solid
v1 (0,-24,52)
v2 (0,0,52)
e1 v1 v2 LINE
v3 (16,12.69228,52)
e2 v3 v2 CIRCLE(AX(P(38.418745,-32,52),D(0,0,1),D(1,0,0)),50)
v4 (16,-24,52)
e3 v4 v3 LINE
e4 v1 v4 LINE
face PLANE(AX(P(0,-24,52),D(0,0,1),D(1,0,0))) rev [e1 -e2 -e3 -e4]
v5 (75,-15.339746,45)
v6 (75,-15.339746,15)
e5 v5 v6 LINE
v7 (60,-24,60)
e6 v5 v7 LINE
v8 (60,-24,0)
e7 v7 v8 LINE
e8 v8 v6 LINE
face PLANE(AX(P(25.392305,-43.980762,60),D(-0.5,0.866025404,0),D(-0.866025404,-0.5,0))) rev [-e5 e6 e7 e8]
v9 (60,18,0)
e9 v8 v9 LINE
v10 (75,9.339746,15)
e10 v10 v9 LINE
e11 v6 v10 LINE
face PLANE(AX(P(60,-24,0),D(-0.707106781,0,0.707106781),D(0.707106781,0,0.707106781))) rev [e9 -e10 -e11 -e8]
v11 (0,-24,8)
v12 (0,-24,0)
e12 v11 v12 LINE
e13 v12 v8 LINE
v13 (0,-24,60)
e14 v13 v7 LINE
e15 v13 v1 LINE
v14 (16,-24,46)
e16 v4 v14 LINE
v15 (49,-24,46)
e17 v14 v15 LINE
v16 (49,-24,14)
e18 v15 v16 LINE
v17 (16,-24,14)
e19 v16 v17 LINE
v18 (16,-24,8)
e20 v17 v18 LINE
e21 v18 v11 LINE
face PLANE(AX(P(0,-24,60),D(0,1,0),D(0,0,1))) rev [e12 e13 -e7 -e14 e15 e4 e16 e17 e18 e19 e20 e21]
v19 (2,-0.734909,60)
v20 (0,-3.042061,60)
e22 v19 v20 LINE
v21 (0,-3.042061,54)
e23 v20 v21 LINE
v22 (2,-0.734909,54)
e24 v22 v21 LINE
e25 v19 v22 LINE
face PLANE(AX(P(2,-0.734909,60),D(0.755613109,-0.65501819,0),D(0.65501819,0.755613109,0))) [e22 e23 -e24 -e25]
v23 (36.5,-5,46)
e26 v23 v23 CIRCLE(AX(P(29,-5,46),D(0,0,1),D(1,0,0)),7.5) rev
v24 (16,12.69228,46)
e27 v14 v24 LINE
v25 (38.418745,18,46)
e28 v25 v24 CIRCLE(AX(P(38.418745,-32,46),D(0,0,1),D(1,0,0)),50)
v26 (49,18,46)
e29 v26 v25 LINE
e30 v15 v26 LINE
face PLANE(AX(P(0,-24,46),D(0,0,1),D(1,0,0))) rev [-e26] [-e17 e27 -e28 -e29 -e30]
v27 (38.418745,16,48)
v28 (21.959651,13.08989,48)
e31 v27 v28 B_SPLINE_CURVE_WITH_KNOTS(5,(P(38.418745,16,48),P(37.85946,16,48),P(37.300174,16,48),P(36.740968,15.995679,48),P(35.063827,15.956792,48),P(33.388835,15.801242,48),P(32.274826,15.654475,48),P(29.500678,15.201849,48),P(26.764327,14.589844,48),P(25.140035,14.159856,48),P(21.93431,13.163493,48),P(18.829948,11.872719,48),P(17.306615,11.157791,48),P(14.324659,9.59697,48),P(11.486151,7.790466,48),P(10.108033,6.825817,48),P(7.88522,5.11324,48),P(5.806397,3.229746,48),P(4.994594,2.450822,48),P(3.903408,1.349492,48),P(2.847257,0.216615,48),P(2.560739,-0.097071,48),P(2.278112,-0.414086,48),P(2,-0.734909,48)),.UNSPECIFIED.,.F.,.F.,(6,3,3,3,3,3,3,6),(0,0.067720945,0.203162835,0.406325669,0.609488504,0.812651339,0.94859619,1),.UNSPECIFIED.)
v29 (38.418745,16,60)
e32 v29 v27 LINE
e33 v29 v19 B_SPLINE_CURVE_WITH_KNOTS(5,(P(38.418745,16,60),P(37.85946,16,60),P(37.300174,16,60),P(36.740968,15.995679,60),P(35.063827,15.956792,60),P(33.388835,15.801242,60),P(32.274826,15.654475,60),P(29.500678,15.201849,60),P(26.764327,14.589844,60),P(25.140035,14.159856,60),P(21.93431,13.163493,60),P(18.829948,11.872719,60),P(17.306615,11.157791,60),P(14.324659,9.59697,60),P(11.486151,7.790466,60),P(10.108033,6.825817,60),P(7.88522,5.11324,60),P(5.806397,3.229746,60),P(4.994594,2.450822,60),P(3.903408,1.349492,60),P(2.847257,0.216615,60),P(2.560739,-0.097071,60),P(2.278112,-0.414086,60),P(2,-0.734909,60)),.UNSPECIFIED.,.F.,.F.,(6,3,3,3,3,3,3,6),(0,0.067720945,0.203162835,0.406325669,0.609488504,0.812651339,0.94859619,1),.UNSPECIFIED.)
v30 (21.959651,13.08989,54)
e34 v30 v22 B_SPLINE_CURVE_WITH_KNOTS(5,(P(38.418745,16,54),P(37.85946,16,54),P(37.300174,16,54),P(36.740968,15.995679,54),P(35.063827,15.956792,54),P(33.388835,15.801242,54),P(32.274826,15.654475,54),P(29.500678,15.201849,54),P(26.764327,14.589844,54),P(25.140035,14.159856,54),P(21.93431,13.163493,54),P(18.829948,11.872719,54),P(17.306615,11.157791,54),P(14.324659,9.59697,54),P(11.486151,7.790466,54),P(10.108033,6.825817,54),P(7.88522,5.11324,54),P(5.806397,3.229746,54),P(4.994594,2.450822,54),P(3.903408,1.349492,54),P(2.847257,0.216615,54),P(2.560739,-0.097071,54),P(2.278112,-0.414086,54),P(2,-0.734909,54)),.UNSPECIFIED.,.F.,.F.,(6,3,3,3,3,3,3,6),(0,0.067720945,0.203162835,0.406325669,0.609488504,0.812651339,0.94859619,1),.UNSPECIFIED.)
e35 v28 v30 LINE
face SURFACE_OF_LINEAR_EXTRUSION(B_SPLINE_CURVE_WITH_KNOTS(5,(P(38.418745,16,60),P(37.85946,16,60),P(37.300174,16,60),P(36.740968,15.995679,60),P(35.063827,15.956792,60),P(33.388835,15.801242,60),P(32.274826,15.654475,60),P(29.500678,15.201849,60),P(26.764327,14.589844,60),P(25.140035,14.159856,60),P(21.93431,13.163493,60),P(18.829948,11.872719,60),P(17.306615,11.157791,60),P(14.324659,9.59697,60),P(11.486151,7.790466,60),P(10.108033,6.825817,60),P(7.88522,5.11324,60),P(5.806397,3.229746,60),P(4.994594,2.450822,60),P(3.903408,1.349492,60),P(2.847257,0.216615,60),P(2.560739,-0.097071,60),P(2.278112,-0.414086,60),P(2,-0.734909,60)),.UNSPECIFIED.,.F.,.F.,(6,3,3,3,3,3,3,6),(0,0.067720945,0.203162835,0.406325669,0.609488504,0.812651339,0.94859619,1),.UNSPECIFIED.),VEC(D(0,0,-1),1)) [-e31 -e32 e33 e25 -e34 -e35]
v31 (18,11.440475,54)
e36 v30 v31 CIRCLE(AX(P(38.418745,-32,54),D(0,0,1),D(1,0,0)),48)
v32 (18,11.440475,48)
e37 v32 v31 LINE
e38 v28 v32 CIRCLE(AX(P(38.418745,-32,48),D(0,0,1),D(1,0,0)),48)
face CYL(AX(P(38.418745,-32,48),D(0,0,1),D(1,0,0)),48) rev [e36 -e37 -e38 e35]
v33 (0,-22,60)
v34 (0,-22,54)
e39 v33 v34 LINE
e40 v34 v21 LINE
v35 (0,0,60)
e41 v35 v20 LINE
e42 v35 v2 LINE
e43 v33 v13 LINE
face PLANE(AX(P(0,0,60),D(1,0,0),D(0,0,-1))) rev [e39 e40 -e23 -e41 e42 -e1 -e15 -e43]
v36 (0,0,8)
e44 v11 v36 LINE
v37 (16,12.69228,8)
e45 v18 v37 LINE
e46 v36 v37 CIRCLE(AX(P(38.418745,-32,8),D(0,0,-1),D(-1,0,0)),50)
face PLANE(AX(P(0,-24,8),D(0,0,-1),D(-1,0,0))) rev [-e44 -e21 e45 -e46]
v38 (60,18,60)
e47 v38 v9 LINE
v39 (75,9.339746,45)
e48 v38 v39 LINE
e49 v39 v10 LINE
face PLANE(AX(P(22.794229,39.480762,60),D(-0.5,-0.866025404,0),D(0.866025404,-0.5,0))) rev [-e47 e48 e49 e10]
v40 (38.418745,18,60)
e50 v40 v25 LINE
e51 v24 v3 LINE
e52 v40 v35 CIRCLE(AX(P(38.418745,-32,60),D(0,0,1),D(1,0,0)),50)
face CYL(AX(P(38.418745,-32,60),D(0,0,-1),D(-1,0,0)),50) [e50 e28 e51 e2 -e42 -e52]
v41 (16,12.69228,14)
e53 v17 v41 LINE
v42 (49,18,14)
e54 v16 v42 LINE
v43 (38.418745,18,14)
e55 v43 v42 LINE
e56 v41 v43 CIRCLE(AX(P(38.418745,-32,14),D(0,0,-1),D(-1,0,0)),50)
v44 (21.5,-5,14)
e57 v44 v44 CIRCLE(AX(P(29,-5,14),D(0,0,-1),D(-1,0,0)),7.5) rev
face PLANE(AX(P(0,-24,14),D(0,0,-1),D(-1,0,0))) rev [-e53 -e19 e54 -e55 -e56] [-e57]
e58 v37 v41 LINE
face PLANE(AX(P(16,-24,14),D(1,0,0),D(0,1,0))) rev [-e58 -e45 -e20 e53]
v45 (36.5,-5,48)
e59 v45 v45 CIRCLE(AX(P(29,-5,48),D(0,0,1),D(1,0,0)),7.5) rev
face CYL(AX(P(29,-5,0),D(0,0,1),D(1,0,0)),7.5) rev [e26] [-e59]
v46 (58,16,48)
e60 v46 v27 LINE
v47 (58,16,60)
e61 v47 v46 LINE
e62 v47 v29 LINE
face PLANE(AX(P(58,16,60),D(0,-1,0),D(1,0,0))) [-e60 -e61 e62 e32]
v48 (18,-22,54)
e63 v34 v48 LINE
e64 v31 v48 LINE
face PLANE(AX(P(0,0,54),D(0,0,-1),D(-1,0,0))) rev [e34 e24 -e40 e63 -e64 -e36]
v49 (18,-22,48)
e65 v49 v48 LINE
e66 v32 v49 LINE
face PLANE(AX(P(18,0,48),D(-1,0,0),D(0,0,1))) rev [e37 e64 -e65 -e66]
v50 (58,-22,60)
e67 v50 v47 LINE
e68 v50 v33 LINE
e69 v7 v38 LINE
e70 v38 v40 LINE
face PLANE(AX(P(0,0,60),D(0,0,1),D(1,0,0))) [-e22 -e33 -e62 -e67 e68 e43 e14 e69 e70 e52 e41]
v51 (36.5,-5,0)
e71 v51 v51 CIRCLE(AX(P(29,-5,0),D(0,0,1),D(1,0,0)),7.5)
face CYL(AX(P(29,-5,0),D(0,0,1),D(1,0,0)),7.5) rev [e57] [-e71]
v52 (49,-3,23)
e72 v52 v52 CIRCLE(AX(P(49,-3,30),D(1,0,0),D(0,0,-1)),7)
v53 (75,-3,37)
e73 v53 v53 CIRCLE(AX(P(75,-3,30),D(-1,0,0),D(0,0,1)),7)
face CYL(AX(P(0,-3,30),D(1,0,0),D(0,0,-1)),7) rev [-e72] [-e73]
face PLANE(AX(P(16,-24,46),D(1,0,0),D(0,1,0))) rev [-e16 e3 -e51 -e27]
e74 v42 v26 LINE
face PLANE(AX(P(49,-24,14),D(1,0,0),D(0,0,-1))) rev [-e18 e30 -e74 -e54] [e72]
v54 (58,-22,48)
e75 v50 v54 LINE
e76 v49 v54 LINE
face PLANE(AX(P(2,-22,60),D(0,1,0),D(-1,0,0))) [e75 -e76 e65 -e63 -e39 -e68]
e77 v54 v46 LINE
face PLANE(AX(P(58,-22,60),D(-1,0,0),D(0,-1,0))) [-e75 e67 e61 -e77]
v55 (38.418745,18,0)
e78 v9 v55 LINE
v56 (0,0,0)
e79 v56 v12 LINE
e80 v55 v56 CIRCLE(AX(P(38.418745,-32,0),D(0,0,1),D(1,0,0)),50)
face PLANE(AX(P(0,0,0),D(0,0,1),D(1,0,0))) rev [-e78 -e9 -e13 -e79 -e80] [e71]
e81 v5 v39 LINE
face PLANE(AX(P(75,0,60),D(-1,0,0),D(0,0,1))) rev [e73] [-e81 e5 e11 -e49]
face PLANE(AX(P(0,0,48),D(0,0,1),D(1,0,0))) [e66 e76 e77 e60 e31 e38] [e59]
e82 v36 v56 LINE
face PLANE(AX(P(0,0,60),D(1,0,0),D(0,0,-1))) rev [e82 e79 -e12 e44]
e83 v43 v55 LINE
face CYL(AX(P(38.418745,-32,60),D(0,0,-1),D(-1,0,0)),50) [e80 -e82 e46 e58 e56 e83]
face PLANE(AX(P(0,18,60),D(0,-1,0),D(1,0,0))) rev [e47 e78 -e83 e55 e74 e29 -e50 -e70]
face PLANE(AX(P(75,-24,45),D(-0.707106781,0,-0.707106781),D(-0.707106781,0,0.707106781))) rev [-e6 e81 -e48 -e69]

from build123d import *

# Parameters (mm, degrees)
BOSS_EXTRUDE1_DEPTH     = 60
CUT_EXTRUDE1_DEPTH      = 100
CUT_EXTRUDE1_DEPTH_BACK = 100
SKETCH2_R               = 7.5
CUT_EXTRUDE2_DEPTH      = 105.828431258
CUT_EXTRUDE3_DEPTH      = 105.828431258
CUT_EXTRUDE3_DEPTH_BACK = 105.828431258
SKETCH4_W               = 49
SKETCH4_H               = 32
CUT_EXTRUDE4_DEPTH      = 105.828431258
CUT_EXTRUDE4_DEPTH_BACK = 105.828431258
SKETCH5_W               = 16
SKETCH5_H               = 6
CUT_EXTRUDE6_DEPTH      = 100
CUT_EXTRUDE6_DEPTH_BACK = 100
SKETCH6_R               = 7
CUT_EXTRUDE7_DEPTH      = 6
CUT_EXTRUDE13_START     = -6
CUT_EXTRUDE13_OUTLINE_R = 7.5
CUT_EXTRUDE13_DEPTH     = 6


# Read off the part's stored shape, not the designer's step: Cut-Extrude13
with BuildPart() as part:
    # Sketch1 → Boss-Extrude1 (new body)
    with BuildSketch(Plane.XY):
        with BuildLine():
            Line((60, 18), (38.418745425, 18))
            ThreePointArc((38.418745425, 18), (17.205541989, 13.276925691), (0, 0))
            Line((0, 0), (0, -24))
            Line((0, -24), (60, -24))
            Line((60, -24), (75, -15.339745962))
            Line((75, -15.339745962), (75, 9.339745962))
            Line((75, 9.339745962), (60, 18))
        make_face()
    extrude(amount=BOSS_EXTRUDE1_DEPTH)

    # Sketch2 → Cut-Extrude1 (cut, two sides: drawn at the far end of the back side and taken through both)
    with BuildSketch(Plane.XY.offset(60).offset(-CUT_EXTRUDE1_DEPTH_BACK)):
        with Locations((29, -5)):
            Circle(SKETCH2_R)
    extrude(amount=CUT_EXTRUDE1_DEPTH + CUT_EXTRUDE1_DEPTH_BACK, mode=Mode.SUBTRACT)

    # Sketch3 → Cut-Extrude2 (cut, through all)
    with BuildSketch(Plane(origin=(0, 18, 0), x_dir=(1, 0, 0), z_dir=(0, 1, 0))):
        Polygon((60, 0), (75, -15), (75, 0), align=None)
        Polygon((60, -60), (75, -60), (75, -45), align=None)
    extrude(amount=-CUT_EXTRUDE2_DEPTH, mode=Mode.SUBTRACT)

    # Sketch4 → Cut-Extrude3 (cut, two sides: drawn at the far end of the back side and taken through both)
    with BuildSketch(Plane(origin=(0, 18, 0), x_dir=(1, 0, 0), z_dir=(0, 1, 0)).offset(-CUT_EXTRUDE3_DEPTH_BACK)):
        with Locations((24.5, -30)):
            Rectangle(SKETCH4_W, SKETCH4_H)
    extrude(amount=CUT_EXTRUDE3_DEPTH + CUT_EXTRUDE3_DEPTH_BACK, mode=Mode.SUBTRACT)

    # Sketch5 → Cut-Extrude4 (cut, two sides: drawn at the far end of the back side and taken through both)
    with BuildSketch(Plane(origin=(0, 18, 0), x_dir=(1, 0, 0), z_dir=(0, 1, 0)).offset(-CUT_EXTRUDE4_DEPTH_BACK)):
        with Locations((8, -11)):
            Rectangle(SKETCH5_W, SKETCH5_H)
        with Locations((8, -49)):
            Rectangle(SKETCH5_W, SKETCH5_H)
    extrude(amount=CUT_EXTRUDE4_DEPTH + CUT_EXTRUDE4_DEPTH_BACK, mode=Mode.SUBTRACT)

    # Sketch6 → Cut-Extrude6 (cut, two sides: drawn at the far end of the back side and taken through both)
    with BuildSketch(Plane(origin=(75, 0, 0), x_dir=(0, 0, -1), z_dir=(1, 0, 0)).offset(-CUT_EXTRUDE6_DEPTH_BACK)):
        with Locations((-30, -3)):
            Circle(SKETCH6_R)
    extrude(amount=CUT_EXTRUDE6_DEPTH + CUT_EXTRUDE6_DEPTH_BACK, mode=Mode.SUBTRACT)

    # 3DSketch1 → Cut-Extrude7 (cut)
    with BuildSketch(Plane(origin=(2, -22, 60), x_dir=(0.8274757743917585, 0.5615014183372646, 0), z_dir=(0, 0, -1))):
        with BuildLine():
            Line((0, 0), (46.338643366, 31.444079427))
            Line((46.338643366, 31.444079427), (67.675697263, 0))
            Line((67.675697263, 0), (51.472683469, -10.994902217))
            add(Edge.make_bspline(
                [(51.472683469, -10.994902217), (51.00988811, -11.308941925), (50.54709275, -11.622981633), (50.081937087, -11.933401281), (48.672308272, -12.842939856), (47.19895125, -13.654736784), (46.194725989, -14.158808627), (43.645035729, -15.341959521), (41.037130207, -16.372005027), (39.451628921, -16.928242653), (36.239509448, -17.903795074), (32.945954255, -18.578814885), (31.283999686, -18.84258235), (27.940100514, -19.225413824), (24.576949104, -19.324401234), (22.894937643, -19.299992929), (20.094000133, -19.130990082), (17.316239244, -18.739706134), (16.20712535, -18.550994584), (14.685796858, -18.252372423), (13.175745435, -17.907974305), (12.762523967, -17.809287194), (12.350651667, -17.705660499), (11.940378642, -17.596347472)],
                knots=[0, 0, 0, 0, 0, 0, 0.067720945, 0.067720945, 0.067720945, 0.203162835, 0.203162835, 0.203162835, 0.406325669, 0.406325669, 0.406325669, 0.609488504, 0.609488504, 0.609488504, 0.812651339, 0.812651339, 0.812651339, 0.94859619, 0.94859619, 0.94859619, 1, 1, 1, 1, 1, 1], degree=5))
            Line((11.940378642, -17.596347472), (8.989958239, -16.810238314))
            Line((8.989958239, -16.810238314), (-1.654951549, -1.123002837))
            Line((-1.654951549, -1.123002837), (0, 0))
        make_face()
    extrude(amount=CUT_EXTRUDE7_DEPTH, mode=Mode.SUBTRACT)

    # Cut-Extrude13 outline → Cut-Extrude13 (cut)
    with BuildSketch(Plane.XY.offset(54).offset(CUT_EXTRUDE13_START)):
        with BuildLine():
            Line((58, 16), (38.418745425, 16))
            add(Edge.make_bspline(
                [(38.418745425, 16), (37.859459734, 16), (37.300174044, 16), (36.740967929, 15.995679173), (35.063827034, 15.956791732), (33.388834665, 15.801241966), (32.274825535, 15.654475296), (29.500677707, 15.201849301), (26.764327053, 14.589844353), (25.140034933, 14.159856293), (23.537172375, 13.661674471), (21.959650667, 13.089890217)],
                knots=[0, 0, 0, 0, 0, 0, 0.067720945, 0.067720945, 0.067720945, 0.203162835, 0.203162835, 0.203162835, 0.406325669, 0.406325669, 0.406325669, 0.406325669, 0.406325669, 0.406325669], degree=5))
            ThreePointArc((21.959650667, 13.089890217), (19.961391414, 12.309435597), (18, 11.440474621))
            Line((18, 11.440474621), (18, -22))
            Line((18, -22), (58, -22))
            Line((58, -22), (58, 16))
        make_face()
        with Locations((29, -5)):
            Circle(CUT_EXTRUDE13_OUTLINE_R, mode=Mode.SUBTRACT)
    extrude(amount=CUT_EXTRUDE13_DEPTH, mode=Mode.SUBTRACT)


solid = part.part
